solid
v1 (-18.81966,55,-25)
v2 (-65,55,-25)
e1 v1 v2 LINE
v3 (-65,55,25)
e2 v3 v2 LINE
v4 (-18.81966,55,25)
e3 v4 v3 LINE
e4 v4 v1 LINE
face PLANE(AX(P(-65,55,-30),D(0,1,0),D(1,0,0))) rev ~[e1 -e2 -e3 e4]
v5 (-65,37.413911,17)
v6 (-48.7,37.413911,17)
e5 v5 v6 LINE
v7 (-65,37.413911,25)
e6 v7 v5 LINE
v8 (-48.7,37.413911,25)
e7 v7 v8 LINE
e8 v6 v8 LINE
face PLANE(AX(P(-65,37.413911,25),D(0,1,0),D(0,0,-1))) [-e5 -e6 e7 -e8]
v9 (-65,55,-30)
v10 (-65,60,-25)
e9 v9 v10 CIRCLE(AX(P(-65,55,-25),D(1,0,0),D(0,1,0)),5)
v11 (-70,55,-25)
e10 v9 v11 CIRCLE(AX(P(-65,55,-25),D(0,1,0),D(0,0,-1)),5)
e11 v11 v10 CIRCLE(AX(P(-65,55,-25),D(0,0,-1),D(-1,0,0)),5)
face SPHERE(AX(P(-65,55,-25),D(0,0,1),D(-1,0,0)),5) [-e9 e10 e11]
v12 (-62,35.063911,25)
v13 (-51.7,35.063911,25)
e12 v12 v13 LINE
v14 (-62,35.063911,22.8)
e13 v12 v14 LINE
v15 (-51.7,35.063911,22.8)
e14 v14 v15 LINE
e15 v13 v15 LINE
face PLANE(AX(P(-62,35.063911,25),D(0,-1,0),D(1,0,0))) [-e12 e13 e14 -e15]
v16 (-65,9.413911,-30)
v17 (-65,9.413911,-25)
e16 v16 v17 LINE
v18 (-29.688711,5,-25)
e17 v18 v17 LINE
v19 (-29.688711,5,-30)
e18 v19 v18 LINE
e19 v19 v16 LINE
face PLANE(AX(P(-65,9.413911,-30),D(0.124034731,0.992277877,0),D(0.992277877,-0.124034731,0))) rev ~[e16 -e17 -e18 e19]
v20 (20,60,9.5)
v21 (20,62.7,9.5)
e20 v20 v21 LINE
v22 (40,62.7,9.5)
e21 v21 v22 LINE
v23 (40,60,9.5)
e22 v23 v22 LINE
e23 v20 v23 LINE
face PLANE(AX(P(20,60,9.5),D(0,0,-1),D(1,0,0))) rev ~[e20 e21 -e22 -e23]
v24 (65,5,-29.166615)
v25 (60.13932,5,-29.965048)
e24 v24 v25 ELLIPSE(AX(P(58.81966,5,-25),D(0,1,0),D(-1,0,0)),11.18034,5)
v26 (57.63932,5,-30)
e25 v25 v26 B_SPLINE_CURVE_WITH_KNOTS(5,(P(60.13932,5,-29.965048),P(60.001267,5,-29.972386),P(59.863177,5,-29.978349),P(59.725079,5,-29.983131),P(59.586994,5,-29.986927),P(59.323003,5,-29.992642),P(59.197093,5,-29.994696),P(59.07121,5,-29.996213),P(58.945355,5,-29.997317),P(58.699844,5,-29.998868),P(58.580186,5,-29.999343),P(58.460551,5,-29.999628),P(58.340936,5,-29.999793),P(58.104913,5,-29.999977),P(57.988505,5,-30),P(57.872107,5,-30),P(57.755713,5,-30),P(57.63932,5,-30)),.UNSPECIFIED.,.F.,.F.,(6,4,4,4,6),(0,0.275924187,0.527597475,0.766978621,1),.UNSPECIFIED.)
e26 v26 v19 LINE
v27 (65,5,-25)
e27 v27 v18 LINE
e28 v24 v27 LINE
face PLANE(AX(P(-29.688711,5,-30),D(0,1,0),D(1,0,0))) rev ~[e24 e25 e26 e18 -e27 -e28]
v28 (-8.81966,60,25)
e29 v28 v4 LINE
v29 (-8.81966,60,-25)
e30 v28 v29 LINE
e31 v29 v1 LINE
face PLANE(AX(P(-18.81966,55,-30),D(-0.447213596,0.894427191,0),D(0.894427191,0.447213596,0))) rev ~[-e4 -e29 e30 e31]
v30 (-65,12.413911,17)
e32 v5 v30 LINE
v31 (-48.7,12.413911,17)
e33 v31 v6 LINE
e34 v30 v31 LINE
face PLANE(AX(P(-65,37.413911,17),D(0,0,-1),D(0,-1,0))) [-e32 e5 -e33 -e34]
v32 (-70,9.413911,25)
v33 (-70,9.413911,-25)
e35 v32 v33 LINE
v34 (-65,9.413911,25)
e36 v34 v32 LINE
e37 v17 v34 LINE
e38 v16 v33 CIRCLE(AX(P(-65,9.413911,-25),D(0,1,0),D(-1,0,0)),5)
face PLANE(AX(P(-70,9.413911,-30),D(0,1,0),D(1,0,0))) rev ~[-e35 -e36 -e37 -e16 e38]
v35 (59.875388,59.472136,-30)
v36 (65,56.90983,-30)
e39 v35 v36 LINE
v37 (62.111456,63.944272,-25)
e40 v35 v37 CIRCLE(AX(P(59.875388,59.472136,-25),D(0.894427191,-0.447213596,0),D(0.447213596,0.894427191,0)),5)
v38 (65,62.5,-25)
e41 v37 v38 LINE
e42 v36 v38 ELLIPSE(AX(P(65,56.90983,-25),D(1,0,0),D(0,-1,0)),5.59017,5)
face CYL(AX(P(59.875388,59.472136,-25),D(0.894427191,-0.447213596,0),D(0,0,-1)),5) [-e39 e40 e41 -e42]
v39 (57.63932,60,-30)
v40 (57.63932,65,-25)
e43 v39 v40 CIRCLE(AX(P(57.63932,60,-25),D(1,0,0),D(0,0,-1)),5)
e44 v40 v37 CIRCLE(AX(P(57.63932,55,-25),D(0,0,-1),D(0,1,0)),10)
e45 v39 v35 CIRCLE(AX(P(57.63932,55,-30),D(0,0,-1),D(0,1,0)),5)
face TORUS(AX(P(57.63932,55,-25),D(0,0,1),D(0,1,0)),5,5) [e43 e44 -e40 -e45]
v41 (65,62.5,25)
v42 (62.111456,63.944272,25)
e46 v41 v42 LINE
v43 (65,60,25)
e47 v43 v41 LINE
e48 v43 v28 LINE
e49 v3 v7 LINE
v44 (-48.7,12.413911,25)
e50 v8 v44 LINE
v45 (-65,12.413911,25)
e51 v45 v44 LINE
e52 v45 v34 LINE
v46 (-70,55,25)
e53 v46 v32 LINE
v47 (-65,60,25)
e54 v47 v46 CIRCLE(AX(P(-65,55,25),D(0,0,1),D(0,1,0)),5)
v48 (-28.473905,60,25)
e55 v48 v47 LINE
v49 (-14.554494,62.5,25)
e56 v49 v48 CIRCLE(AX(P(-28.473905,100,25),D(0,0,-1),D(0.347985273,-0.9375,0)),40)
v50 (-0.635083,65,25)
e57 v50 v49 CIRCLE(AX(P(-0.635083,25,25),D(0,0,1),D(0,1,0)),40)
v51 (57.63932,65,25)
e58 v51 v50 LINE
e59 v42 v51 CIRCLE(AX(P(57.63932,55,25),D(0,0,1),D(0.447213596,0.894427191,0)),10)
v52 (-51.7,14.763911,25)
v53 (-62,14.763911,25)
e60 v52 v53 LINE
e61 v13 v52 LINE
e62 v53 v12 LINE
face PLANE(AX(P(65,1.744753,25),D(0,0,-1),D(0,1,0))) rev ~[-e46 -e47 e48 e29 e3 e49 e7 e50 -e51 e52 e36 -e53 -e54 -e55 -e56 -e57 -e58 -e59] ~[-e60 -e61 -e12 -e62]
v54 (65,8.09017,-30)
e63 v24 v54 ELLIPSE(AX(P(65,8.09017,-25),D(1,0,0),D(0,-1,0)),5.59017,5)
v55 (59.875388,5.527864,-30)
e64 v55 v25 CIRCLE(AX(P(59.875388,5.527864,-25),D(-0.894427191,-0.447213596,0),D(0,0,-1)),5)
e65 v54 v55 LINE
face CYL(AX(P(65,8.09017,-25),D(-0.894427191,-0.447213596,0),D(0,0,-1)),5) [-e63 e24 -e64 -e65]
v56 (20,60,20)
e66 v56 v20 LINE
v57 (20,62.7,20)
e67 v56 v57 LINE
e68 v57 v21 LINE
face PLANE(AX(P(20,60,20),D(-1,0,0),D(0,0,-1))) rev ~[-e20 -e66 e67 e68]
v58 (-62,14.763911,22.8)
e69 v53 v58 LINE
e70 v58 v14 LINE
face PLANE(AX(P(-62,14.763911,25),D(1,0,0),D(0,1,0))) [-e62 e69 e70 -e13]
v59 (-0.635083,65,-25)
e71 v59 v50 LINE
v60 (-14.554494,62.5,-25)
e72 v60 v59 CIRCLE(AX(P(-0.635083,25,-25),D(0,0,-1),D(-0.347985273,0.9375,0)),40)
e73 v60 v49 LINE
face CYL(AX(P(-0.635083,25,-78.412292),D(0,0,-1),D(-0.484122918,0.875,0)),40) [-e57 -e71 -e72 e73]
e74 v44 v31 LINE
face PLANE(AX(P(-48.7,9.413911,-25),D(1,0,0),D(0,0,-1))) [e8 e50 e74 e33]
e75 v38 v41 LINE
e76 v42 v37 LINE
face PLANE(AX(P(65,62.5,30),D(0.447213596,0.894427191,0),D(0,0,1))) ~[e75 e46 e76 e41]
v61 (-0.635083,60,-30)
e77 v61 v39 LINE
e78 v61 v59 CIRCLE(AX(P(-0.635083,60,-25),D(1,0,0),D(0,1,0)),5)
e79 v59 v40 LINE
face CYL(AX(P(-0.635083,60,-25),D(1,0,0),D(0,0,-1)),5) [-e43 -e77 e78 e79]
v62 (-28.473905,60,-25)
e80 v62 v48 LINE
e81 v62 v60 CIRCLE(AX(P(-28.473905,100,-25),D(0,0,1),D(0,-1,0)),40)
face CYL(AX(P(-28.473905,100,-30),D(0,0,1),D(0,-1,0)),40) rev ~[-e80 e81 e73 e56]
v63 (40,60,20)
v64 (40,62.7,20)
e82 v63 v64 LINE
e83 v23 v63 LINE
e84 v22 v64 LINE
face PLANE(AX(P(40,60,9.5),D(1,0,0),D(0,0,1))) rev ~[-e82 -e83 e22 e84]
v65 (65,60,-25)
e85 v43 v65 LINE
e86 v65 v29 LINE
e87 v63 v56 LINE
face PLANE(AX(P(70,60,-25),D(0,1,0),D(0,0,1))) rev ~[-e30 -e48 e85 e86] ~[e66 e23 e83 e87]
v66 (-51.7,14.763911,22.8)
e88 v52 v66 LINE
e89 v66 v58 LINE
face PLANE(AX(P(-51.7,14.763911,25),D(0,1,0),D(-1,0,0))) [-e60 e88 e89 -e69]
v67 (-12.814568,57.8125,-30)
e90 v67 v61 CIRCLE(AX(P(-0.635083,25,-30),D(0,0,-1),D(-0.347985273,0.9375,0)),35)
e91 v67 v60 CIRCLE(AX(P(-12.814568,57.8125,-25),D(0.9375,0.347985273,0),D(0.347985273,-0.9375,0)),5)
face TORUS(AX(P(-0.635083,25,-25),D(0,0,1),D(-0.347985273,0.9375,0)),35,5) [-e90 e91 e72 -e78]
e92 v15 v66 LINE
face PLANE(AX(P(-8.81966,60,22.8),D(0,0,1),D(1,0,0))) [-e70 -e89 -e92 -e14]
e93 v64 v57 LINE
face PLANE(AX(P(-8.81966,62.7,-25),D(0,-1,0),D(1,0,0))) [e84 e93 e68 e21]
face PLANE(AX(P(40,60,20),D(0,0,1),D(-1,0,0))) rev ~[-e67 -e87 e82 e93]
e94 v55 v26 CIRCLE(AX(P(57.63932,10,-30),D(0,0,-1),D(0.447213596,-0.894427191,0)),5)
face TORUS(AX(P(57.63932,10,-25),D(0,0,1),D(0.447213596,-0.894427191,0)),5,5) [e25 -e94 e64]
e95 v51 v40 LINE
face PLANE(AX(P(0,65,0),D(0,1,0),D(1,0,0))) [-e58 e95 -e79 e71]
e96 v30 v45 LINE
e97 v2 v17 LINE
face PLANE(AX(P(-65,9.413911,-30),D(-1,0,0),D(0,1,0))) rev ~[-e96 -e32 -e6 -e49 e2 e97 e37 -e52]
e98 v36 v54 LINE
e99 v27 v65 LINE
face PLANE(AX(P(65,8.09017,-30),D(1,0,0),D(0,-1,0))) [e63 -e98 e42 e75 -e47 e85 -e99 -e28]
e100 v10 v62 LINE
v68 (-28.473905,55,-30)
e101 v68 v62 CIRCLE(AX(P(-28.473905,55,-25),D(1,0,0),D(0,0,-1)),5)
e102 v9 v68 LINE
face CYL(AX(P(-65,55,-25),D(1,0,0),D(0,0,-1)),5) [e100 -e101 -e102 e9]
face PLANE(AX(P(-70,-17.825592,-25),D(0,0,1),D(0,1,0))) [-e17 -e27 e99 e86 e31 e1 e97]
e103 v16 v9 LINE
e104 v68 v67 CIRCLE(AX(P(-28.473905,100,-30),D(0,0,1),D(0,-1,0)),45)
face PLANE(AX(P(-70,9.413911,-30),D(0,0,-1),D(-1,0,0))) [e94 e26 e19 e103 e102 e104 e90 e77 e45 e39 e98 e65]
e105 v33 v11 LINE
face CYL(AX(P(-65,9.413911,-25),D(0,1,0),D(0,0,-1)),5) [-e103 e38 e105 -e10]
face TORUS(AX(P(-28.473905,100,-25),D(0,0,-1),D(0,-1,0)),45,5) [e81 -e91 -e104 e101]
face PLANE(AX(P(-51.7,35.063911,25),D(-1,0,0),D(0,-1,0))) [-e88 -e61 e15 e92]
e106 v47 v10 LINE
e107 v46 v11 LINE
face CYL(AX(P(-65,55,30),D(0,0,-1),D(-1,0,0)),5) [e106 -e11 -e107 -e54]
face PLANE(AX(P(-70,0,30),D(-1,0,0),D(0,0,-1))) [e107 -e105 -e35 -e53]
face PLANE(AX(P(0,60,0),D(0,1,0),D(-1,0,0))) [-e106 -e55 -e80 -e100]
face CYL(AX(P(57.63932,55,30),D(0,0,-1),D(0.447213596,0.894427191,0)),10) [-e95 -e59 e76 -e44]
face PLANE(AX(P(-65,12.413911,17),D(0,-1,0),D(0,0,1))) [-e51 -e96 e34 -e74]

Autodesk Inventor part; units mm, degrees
ref_plane "YZ Plane" through (0, 0, 0) normal (1, 0, 0) x (0, 1, 0)
ref_plane "XZ Plane" through (0, 0, 0) normal (0, 1, 0) x (-1, 0, 0)
ref_plane "XY Plane" through (0, 0, 0) normal (0, 0, 1) x (1, 0, 0)
sketch "Sketch1" plane through (0, 0, 0) normal (0, 1, 0) x (-1, 0, 0)
  line L0 (-70, 30) -> (70, 30)
  line L1 (70, 30) -> (70, -30)
  line L2 (70, -30) -> (-70, -30)
  line L3 (-70, -30) -> (-70, 30)
  line L4 (-70, 30) -> (70, -30) construction
  line L5 (70, 30) -> (-70, -30) construction
  point P0 (0, 0)
  dimension "d0" = 140
  dimension "d1" = 60
extrude "Extrusion1" add sketch "Sketch1" along normal blind 60
sketch "Sketch2" plane through (0, 60, 0) normal (0, 1, 0) x (1, 0, 0)
  point P0 (0, 0)
sketch "Sketch3" plane through (0, 60, 0) normal (0, 1, 0) x (1, 0, 0)
  line L0 (70, 30) -> (-70, 30) projected
  line L1 (-70, -30) -> (70, -30) projected
  line L2 (70, 30) -> (-20, 30)
  line L3 (-20, 30) -> (-20, -30)
  line L4 (-20, -30) -> (70, -30)
  line L5 (70, -30) -> (70, 30)
  point P0 (0, 0)
  point P1 (70, -30)
  point P2 (-20, 30)
  dimension "d4" = 90
extrude "Extrusion2" add sketch "Sketch3" along normal blind 5
chamfer "Chamfer2" distance 5 distance2 40 1 edges at (-70, 0, 0) measured on face at (-70, 20, -10)
sketch "Sketch8" plane through (70, 0, 30) normal (1, 0, 0) x (0, 0, -1)
  circle A0 centre (30, 32.5) radius 13.25
  line L0 (0, 0) -> (60, 0) projected
  line L1 (60, 0) -> (60, 65) projected
  line L2 (0, 65) -> (60, 65) projected
  point P0 (30, 0)
  point P1 (60, 32.5)
  dimension "d26" = 26.5
  dimension "d27" = 32.5
  dimension "d28" = 30
  dimension "d88" = 32.5
extrude "Extrusion6" cut sketch "Sketch8" against normal blind 10
sketch "Sketch9" plane through (70, 0, -30) normal (0, 0, -1) x (-1, 0, 0)
  line L0 (5, 60) -> (5, 5)
  line L1 (5, 5) -> (99.688711, 5)
  line L2 (99.688711, 5) -> (135, 9.413911)
  line L3 (135, 9.413911) -> (135, 55)
  line L4 (135, 55) -> (88.81966, 55)
  line L5 (88.81966, 55) -> (78.81966, 60)
  line L6 (78.81966, 60) -> (5, 60)
  line L7 (0, 65) -> (90, 65)
  line L8 (50, 80) -> (90, 60)
  line L9 (90, 60) -> (140, 60)
  line L10 (140, 5) -> (140, 60)
  line L11 (140, 5) -> (100, 0)
  line L12 (0, 0) -> (100, 0)
  line L13 (0, 0) -> (0, 65)
  point P0 (70, 0)
  dimension "d35" = 5
  dimension "d36" = 5
  dimension "d37" = 5
  dimension "d38" = 5
  dimension "d39" = 5
  dimension "d40" = 5
  dimension "d41" = 5
extrude "Extrusion7" cut sketch "Sketch9" against normal blind 55 contours L6 L5 L4 L3 L2 L1 L0
ref_plane "Work Plane1" through (70, 0, 0) normal (0, 0, 1) x (1, 0, 0)
fillet "Fillet6" radius 5 1 edges at (-70, 60, 0)
fillet "Fillet9" radius 5 1 edges at (-70, 5, 0)
fillet "Fillet21" radius 40 1 edges at (-20, 65, 0)
fillet "Fillet22" radius 40 1 edges at (-20, 60, 0)
chamfer "Chamfer3" distance 10 distance2 5 1 edges at (70, 65, 0) measured on face at (46.455, 65, 10)
fillet "Fillet23" radius 5 1 edges at (70, 60, 0)
fillet "Fillet24" radius 10 1 edges at (60, 65, 0)
chamfer "Chamfer4" distance 5 distance2 10 1 edges at (70, 0, 0) measured on face at (70, 6.4489, -0.5324)
fillet "Fillet25" radius 10 1 edges at (60, 0, 0)
fillet "Fillet26" radius 5 1 edges at (70, 5, 0)
fillet "Fillet27" radius 5 15 edges at (59.9368, 64.7325, 30) (64.6738, 62.6631, 30) (69.2533, 59.5385, 30) (70, 32.5, 30) (69.2533, 5.4615, 30) (64.6738, 2.3369, 30) (59.9368, 0.2675, 30) (13.8197, 0, 30) (-7.7062, 64.37, 30) (-21.4028, 60.63, 30) (-46.737, 60, 30) (-70, 32.207, 30) (-68.7484, 6.1049, 30) (-47.8101, 2.2263, 30) (28.5021, 65, 30)
ref_plane "Work Plane7" through (65, 55, -24.5) normal (0, 0, -1) x (-1, 0, 0)
sketch "Sketch24" plane through (65, 55, -24.5) normal (0, 0, -1) x (-1, 0, 0)
  line L0 (0, 0) -> (5, 0) projected
  line L1 (5, 5) -> (5, 0) projected
  line L2 (5, 0) -> (5, 5) projected
  line L3 (0, 0) -> (0, 5) projected
  line L4 (5, 5) -> (0, 0)
  line L5 (5, -45) -> (5, -50) projected
  line L6 (0, -45) -> (5, -45) projected
  line L7 (0, -50) -> (0, -45) projected
  line L8 (0, -45) -> (5, -50)
  point P0 (65, -55)
extrude "Extrusion21" cut sketch "Sketch24" against normal blind 5
sketch "Sketch27" plane through (65, 5, -30) normal (-1, 0, 0) x (0, 0, 1)
  line L0 (8.5, 30) -> (13.5, 30)
  line L1 (13.5, 30) -> (13.5, 25)
  line L2 (13.5, 25) -> (8.5, 25)
  line L3 (8.5, 25) -> (8.5, 30)
  line L4 (8.5, 30) -> (13.5, 25) construction
  line L5 (13.5, 30) -> (8.5, 25) construction
  circle A0 centre (30, 27.5) radius 13.25 projected
  line L6 (30, 73) -> (30, -18) projected
  line L7 (51.5, 30) -> (46.5, 30)
  line L8 (46.5, 30) -> (46.5, 25)
  line L9 (46.5, 25) -> (51.5, 25)
  line L10 (51.5, 25) -> (51.5, 30)
  point P0 (30, -5)
  point P1 (11, 27.5)
  dimension "d137" = 0
  dimension "d138" = 19
  dimension "d139" = 5
  dimension "d140" = 5
extrude "Extrusion24" add sketch "Sketch27" along normal blind 10 contours L0 L1 L2 L3 | L10 L9 L8 L7
sketch "Sketch28" plane through (65, 30, 16.5) normal (0, 0, -1) x (-1, 0, 0)
  line L0 (0, 5) -> (10, 5) projected
  line L1 (0, 0) -> (10, 0) projected
  line L2 (10, 5) -> (5, 5)
  line L3 (5, 5) -> (5, 0)
  line L4 (5, 0) -> (10, 0)
  line L5 (10, 0) -> (10, 5)
  point P0 (65, -30)
  point P1 (5, 5)
  dimension "d143" = 5
extrude "Extrusion25" add sketch "Sketch28" along normal up to surface (33 mm away)
sketch "Sketch29" plane through (55, 5, -30) normal (-1, 0, 0) x (0, 0, 1)
  line L0 (30, 73) -> (30, -18) projected
  circle A0 centre (25.5, 27.5) radius 1.5
  line L1 (51.5, 30) -> (8.5, 30) projected
  line L2 (8.5, 25) -> (51.5, 25) projected
  circle A1 centre (34.5, 27.5) radius 1.5
  point P0 (30, -5)
  dimension "d146" = 4.5
  dimension "d147" = 3
  dimension "d148" = 2.5
  dimension "d149" = 2.5
extrude "Extrusion26" cut sketch "Sketch29" against normal up to surface (5 mm away)
sketch "Sketch30" plane through (55, 5, -30) normal (-1, 0, 0) x (0, 0, 1)
  line L0 (30, 73) -> (30, -18) projected
  circle A0 centre (30, 27.5) radius 3.5
  line L1 (51.5, 30) -> (8.5, 30) projected
  point P0 (30, -5)
  dimension "d152" = 2.5
  dimension "d153" = 7
extrude "Extrusion27" cut sketch "Sketch30" against normal up to surface (5 mm away)
sketch "Sketch32" plane through (0, 0, 0) normal (0, -1, 0) x (1, 0, 0)
  circle A0 centre (20, 0) radius 14.25
  line L0 (65, -30) -> (65, 25) projected
  point P0 (0, 0)
  point P1 (65, -21.5)
  dimension "d158" = 28.5
  dimension "d159" = 45
extrude "Extrusion29" cut sketch "Sketch32" against normal blind 5
ref_plane "Work Plane4" through (0, 32.5, 0) normal (0, -1, 0) x (1, 0, 0)
sketch "Sketch34" plane through (-29.688711, 5, -30) normal (0, 1, 0) x (1, 0, 0)
  line L0 (15.188711, -15.5) -> (8.188711, -15.5)
  line L1 (8.188711, -15.5) -> (8.188711, -8.5)
  line L2 (8.188711, -8.5) -> (15.188711, -8.5)
  line L3 (15.188711, -8.5) -> (15.188711, -15.5)
  line L4 (15.188711, -15.5) -> (8.188711, -8.5) construction
  line L5 (8.188711, -15.5) -> (15.188711, -8.5) construction
  line L6 (127.688711, -30) -> (-68.311289, -30)
  circle A0 centre (49.688711, -30) radius 14.25
  line L7 (15.188711, -44.5) -> (8.188711, -44.5)
  line L8 (8.188711, -44.5) -> (8.188711, -51.5)
  line L9 (8.188711, -51.5) -> (15.188711, -51.5)
  line L10 (15.188711, -51.5) -> (15.188711, -44.5)
  point P0 (29.688711, -30)
  point P1 (11.688711, -12)
  dimension "d163" = 7
  dimension "d164" = 7
  dimension "d166" = 18
  dimension "d167" = 38
extrude "Extrusion30" add sketch "Sketch34" along normal blind 12 contours L0 L1 L2 L3 | L10 L9 L8 L7
sketch "Sketch35" plane through (-29.688711, 17, -30) normal (0, 1, 0) x (1, 0, 0)
  circle A0 centre (11.688711, -48) radius 2
  line L0 (8.188711, -44.5) -> (8.188711, -51.5)
  line L1 (15.188711, -44.5) -> (8.188711, -44.5)
  line L2 (15.188711, -51.5) -> (15.188711, -44.5)
  line L3 (127.688711, -30) -> (-68.311289, -30)
  circle A1 centre (11.688711, -12) radius 2
  point P0 (29.688711, -30)
  dimension "d170" = 4
  dimension "d171" = 3.5
  dimension "d172" = 3.5
  dimension "d173" = 3.5
extrude "Extrusion31" cut sketch "Sketch35" against normal blind 5
sketch "Sketch37" plane through (-29.688711, 5, -30) normal (0, 1, 0) x (1, 0, 0)
  line L0 (8.188711, -51.5) -> (8.188711, -44.5)
  line L1 (0, -55) -> (94.688711, -55)
  line L2 (8.188711, -51.5) -> (15.188711, -51.5)
  line L3 (15.188711, -51.5) -> (15.188711, -55)
  line L4 (15.188711, -55) -> (8.188711, -55)
  line L5 (8.188711, -55) -> (8.188711, -51.5)
  line L6 (15.188711, -44.5) -> (15.188711, -51.5)
  point P0 (29.688711, -30)
  point P1 (8.188711, -55)
  dimension "d178" = 0
extrude "Extrusion32" add sketch "Sketch37" along normal blind 12
sketch "Sketch38" plane through (65, 30, 21.5) normal (0, 0, 1) x (1, 0, 0)
  line L0 (0, 5) -> (0, 0) projected
  line L1 (0, 5) -> (-10, 5) projected
  line L2 (-10, 0) -> (-10, 5) projected
  line L3 (0, 0) -> (-10, 0) projected
  point P0 (-65, -30)
extrude "Extrusion33" add sketch "Sketch38" along normal up to surface (3.5 mm away)
ref_plane "Work Plane6" through (-70, 9.413911, -22.5) normal (0, 0, -1) x (-1, 0, 0)
ref_plane "Work Plane5" through (-70, 9.413911, -15) normal (0, 0, -1) x (-1, 0, 0)
sketch "Sketch42" plane through (55, 5, -30) normal (-1, 0, 0) x (0, 0, 1)
  line L0 (22.5, 34) -> (37.5, 34)
  line L1 (37.5, 34) -> (37.5, 21)
  line L2 (37.5, 21) -> (22.5, 21)
  line L3 (22.5, 21) -> (22.5, 34)
  arc A0 (32.44949, 25) -> (33.361111, 26.523818) centre (30, 27.5) ccw
  line L4 (22.5, 34) -> (37.5, 21) construction
  line L5 (37.5, 34) -> (22.5, 21) construction
  point P0 (30, -5)
  dimension "d193" = 15
  dimension "d194" = 13
extrude "Extrusion36" add sketch "Sketch42" against normal blind 5
sketch "Sketch43" plane through (55, 5, -30) normal (-1, 0, 0) x (0, 0, 1)
  line L0 (24, 32.5) -> (36, 32.5)
  line L1 (36, 32.5) -> (36, 22.5)
  line L2 (36, 22.5) -> (24, 22.5)
  line L3 (24, 22.5) -> (24, 32.5)
  circle A0 centre (30, 27.5) radius 2.15 projected
  line L4 (24, 32.5) -> (36, 22.5) construction
  line L5 (36, 32.5) -> (24, 22.5) construction
  point P0 (30, -5)
  dimension "d197" = 12
  dimension "d199" = 10
extrude "Extrusion37" cut sketch "Sketch43" against normal blind 2.5
sketch "Sketch44" plane through (55, 5, -30) normal (-1, 0, 0) x (0, 0, 1)
  line L0 (22.5, 25) -> (22.5, 21) projected
  line L1 (8.5, 25) -> (22.5, 25) projected
  line L2 (22.5, 21) -> (18.5, 25)
  point P0 (30, -5)
  dimension "d202" = 45
  dimension "d203" = 45
extrude "Extrusion38" add sketch "Sketch44" against normal blind 5
mirror "Mirror1" about plane through (70, 0, 0) normal (0, 0, 1) of "Extrusion38"
sketch "Sketch45" plane through (55, 5, -30) normal (-1, 0, 0) x (0, 0, 1)
  line L0 (37.5, 34) -> (22.5, 34) projected
  line L1 (22.5, 34) -> (18.5, 30)
  line L2 (8.5, 30) -> (22.5, 30) projected
  line L3 (22.5, 34) -> (22.5, 30) projected
  point P0 (30, -5)
  dimension "d206" = 45
  dimension "d207" = 45
extrude "Extrusion39" add sketch "Sketch45" against normal blind 5
mirror "Mirror2" about plane through (70, 0, 0) normal (0, 0, 1) of "Extrusion39"
sketch "Sketch46" plane through (55, 32.5, 0) normal (-1, 0, 0) x (0, 0, 1)
  circle A0 centre (0, 0) radius 4
  point P0 (0, -32.5)
  dimension "d210" = 8
extrude "Extrusion40" cut sketch "Sketch46" against normal blind 5
sketch "Sketch47" plane through (70, 0, 25) normal (0, 0, -1) x (-1, 0, 0)
  line L0 (5, 35) -> (15, 35)
  line L1 (15, 35) -> (15, 30)
  line L2 (15, 30) -> (5, 30)
  line L3 (5, 5) -> (5, 30)
  line L4 (84.5, 5) -> (5, 5)
  line L5 (84.5, 5) -> (84.5, 17)
  line L6 (84.5, 17) -> (91.5, 17)
  line L7 (91.5, 17) -> (91.5, 5)
  line L8 (99.688711, 5) -> (91.5, 5)
  line L9 (135, 9.413911) -> (99.688711, 5)
  line L10 (135, 55) -> (135, 9.413911)
  line L11 (88.81966, 55) -> (135, 55)
  line L12 (78.81966, 60) -> (88.81966, 55)
  line L13 (5, 60) -> (78.81966, 60)
  line L14 (5, 35) -> (5, 60)
  line L15 (91.5, 5) -> (84.5, 5)
  point P0 (70, 0)
extrude "Extrusion41" cut sketch "Sketch47" against normal blind 10
sketch "Sketch48" plane through (-70, 9.413911, -30) normal (0, 0, -1) x (-1, 0, 0)
  line L0 (-135, 50.586089) -> (-61.18034, 50.586089)
  line L1 (-61.18034, 50.586089) -> (-51.18034, 45.586089)
  line L2 (-51.18034, 45.586089) -> (-5, 45.586089)
  line L3 (-5, 45.586089) -> (-5, 0)
  line L4 (-5, 0) -> (-40.311289, -4.413911)
  line L5 (-40.311289, -4.413911) -> (-135, -4.413911)
  line L6 (-135, -4.413911) -> (-135, 50.586089)
  point P0 (-70, -9.413911)
extrude "Extrusion42" add sketch "Sketch48" against normal blind 5
fillet "Fillet29" radius 5 16 edges at (-7.7062, 64.37, -30) (-21.4028, 60.63, -30) (-46.737, 60, -30) (-68.5355, 58.5355, -30) (-70, 32.207, -30) (-68.7484, 6.1049, -30) (-47.8101, 2.2263, -30) (59.9368, 64.7325, -30) (64.6738, 62.6631, -30) (69.2533, 59.5385, -30) (70, 32.5, -30) (69.2533, 5.4615, -30) (64.6738, 2.3369, -30) (59.9368, 0.2675, -30) (13.8197, 0, -30) (28.5021, 65, -30)
sketch "Sketch50" plane through (70, 8.09017, 25) normal (1, 0, 0) x (0, 0, -1)
  line L0 (50, -3.09017) -> (-4.166615, -3.09017)
  line L1 (-5, 21.90983) -> (-5, 0)
  line L2 (-5, 48.81966) -> (-5, 26.90983)
  line L3 (-5, 26.90983) -> (-5, 21.90983)
  ellipse E0 centre (0, 0) end of major axis (0, -5.59017) minor radius 5 (-5, 0) -> (-4.166615, -3.09017) ccw
  line L4 (50, 51.90983) -> (-4.166615, 51.90983)
  line L5 (55, 0) -> (55, 48.81966)
  ellipse E1 centre (50, 0) end of major axis (55, 0) minor radius 4.472136 (50, -4.472136) -> (55, 0) ccw
  line L6 (46.5, 51.90983) -> (55, 51.90983)
  line L7 (55, 51.90983) -> (55, 48.23178)
  line L8 (-4.166615, 51.90983) -> (-5, 51.90983)
  ellipse E2 centre (0, 48.81966) end of major axis (-5, 48.81966) minor radius 4.472136 (0, 53.291796) -> (-5, 48.81966) ccw
  line L9 (-5, 51.90983) -> (-5, 48.81966)
  line L10 (46.5, -3.09017) -> (53.614355, -3.09017)
  line L11 (50, 48.81966) -> (50, 0)
  line L12 (50, -4.472136) -> (50, 0)
  line L13 (50, 48.81966) -> (50, 53.291796)
  point P0 (25, -8.09017)
  point P1 (-3.614355, 51.90983)
sketch "Sketch51" plane through (-0.635083, 60, 30) normal (0, -1, 0) x (1, 0, 0)
  line L0 (65.635083, -55) -> (65.635083, -0.833385)
  line L1 (70.635083, -5) -> (70.635083, -55)
  line L2 (70.635083, -51.5) -> (70.635083, -0.833385)
  line L3 (65.635083, -0.833385) -> (70.635083, -0.833385)
  line L4 (58.274403, 0) -> (-29.053628, 0)
  line L5 (-8.184577, -55) -> (65.635083, -55)
  line L6 (70.635083, -60) -> (65.635083, -55)
  line L7 (70.635083, -60) -> (65.635083, -55)
  line L8 (67.871151, -55) -> (70.635083, -55)
  line L9 (65.635083, -55) -> (70.635083, -55)
  point P0 (0.635083, -30)
  point P1 (65.635083, -51.5)
  point P2 (65.635083, -55)
  point P3 (67.871151, -55)
extrude "Extrusion43" cut sketch "Sketch50" against normal blind 50 contours L0 E0 L1 L3 L2 E2 L4 L13 L11 L12
extrude "Extrusion44" cut sketch "Sketch51" against normal blind 50
sketch "Sketch52" plane through (-0.635083, 60, 30) normal (0, 1, 0) x (1, 0, 0)
  line L0 (67.180168, 1.385645) -> (65.635083, 1.385645)
  line L1 (65.635083, 1.385645) -> (68.166593, 1.385645)
  line L2 (68.166593, 1.385645) -> (68.166593, -1.6054)
  line L3 (68.166593, -1.6054) -> (65.635083, -1.6054)
  line L4 (65.635083, -1.6054) -> (65.635083, 1.385645)
  point P0 (0.635083, 30)
  point P1 (67.180168, 1.385645)
extrude "Extrusion45" cut sketch "Sketch52" against normal blind 10
sketch "Sketch53" plane through (-70, 9.413911, 25) normal (-1, 0, 0) x (0, 0, 1)
  line L0 (-50, 0) -> (-50, 45.586089)
  line L1 (-50, 0) -> (13.21215, 0)
  line L2 (13.21215, 0) -> (13.21215, -27.239503)
  line L3 (13.21215, -27.239503) -> (-50, -27.239503)
  line L4 (-50, -27.239503) -> (-50, 0)
  point P0 (-25, -9.413911)
extrude "Extrusion46" cut sketch "Sketch53" against normal blind 200
sketch "Sketch54" plane through (-14.5, 17, 25) normal (1, 0, 0) x (0, 0, -1)
  line L0 (0, 0) -> (10.5, 0)
  line L1 (0, 0) -> (47.590826, 0)
  line L2 (47.590826, 0) -> (47.590826, -20.025121)
  line L3 (47.590826, -20.025121) -> (0, -20.025121)
  line L4 (0, -20.025121) -> (0, 0)
  point P0 (25, -17)
  point P1 (10.5, 0)
extrude "Extrusion47" cut sketch "Sketch54" against normal blind 10
sketch "Sketch55" plane through (57.63932, 5, -30) normal (0, 0, -1) x (-1, 0, 0)
  line L0 (122.63932, 4.413911) -> (87.328031, 0)
  line L1 (127.63932, 4.413911) -> (122.63932, 4.413911)
  line L2 (87.328031, 0) -> (0, 0)
  line L3 (-7.36068, 55) -> (-7.36068, 57.5)
  line L4 (-7.36068, 3.09017) -> (-7.36068, 51.90983)
  line L5 (-7.36068, 51.90983) -> (-7.36068, 55)
  line L6 (-9.596748, -1.381966) -> (-7.36068, 3.09017)
  line L7 (-7.36068, 3.09017) -> (-7.36068, 0)
  arc A0 (-2.236068, 0.527864) -> (0, 0) centre (0, 5) ccw
  line L8 (-7.36068, 0) -> (0, 0)
  arc A1 (-9.596748, 56.381966) -> (-12.36068, 51.90983) centre (-7.36068, 51.90983) ccw
  line L9 (-12.36068, 51.90983) -> (-12.36068, 3.09017)
  arc A2 (-12.36068, 3.09017) -> (-9.596748, -1.381966) centre (-7.36068, 3.09017) ccw
  line L10 (-9.596748, -1.381966) -> (-4.472136, -3.944272)
  arc A3 (-4.472136, -3.944272) -> (0, -5) centre (0, 5) ccw
  line L11 (0, -5) -> (87.63932, -5)
  line L12 (87.63932, -5) -> (123.259494, -0.547478)
  arc A4 (123.259494, -0.547478) -> (127.63932, 4.413911) centre (122.63932, 4.413911) ccw
  line L13 (-7.36068, 57.5) -> (-9.596748, 56.381966)
  point P0 (57.63932, -5)
extrude "Extrusion48" cut sketch "Sketch55" against normal blind 10
sketch "Sketch56" plane through (65, 60, 29.166615) normal (1, 0, 0) x (0, 0, -1)
  arc A0 (4.166615, 5) -> (-0.833385, 0) centre (4.166615, 0) ccw
  line L0 (4.166615, 5) -> (-2.994967, 5)
  line L1 (-2.994967, 5) -> (-2.994967, -58.255247)
  line L2 (-2.994967, -58.255247) -> (4.166615, -58.255247)
  line L3 (4.166615, -58.255247) -> (4.166615, 5)
  point P0 (29.166615, -60)
extrude "Extrusion49" cut sketch "Sketch56" against normal through all
sketch "Sketch57" plane through (-8.81966, 60, -25) normal (0, -1, 0) x (1, 0, 0)
  line L0 (28.81966, 34.5) -> (48.81966, 34.5)
  line L1 (48.81966, 34.5) -> (48.81966, 45)
  line L2 (48.81966, 45) -> (28.81966, 45)
  line L3 (28.81966, 45) -> (28.81966, 34.5)
  line L4 (73.81966, 0) -> (73.81966, 50)
  line L5 (73.81966, 50) -> (0, 50)
  point P0 (8.81966, 25)
  point P1 (48.81966, 39.75)
  point P2 (36.90983, 50)
  dimension "d232" = 25
  dimension "d233" = 15.5
  dimension "d234" = 5
  dimension "d235" = 20
extrude "Extrusion50" cut sketch "Sketch57" against normal blind 2.7
sketch "Sketch58" plane through (-65, 9.413911, -25) normal (1, 0, 0) x (0, 0, -1)
  line L0 (-50, 28) -> (-42, 28)
  line L1 (-42, 28) -> (-42, 3)
  line L2 (-42, 3) -> (-50, 3)
  line L3 (-50, 3) -> (-50, 28)
  line L4 (0, 0) -> (-50, 0)
  line L5 (-50, 45.586089) -> (-50, 0)
  point P0 (-25, -9.413911)
  dimension "d238" = 8
  dimension "d239" = 3
  dimension "d240" = 0
  dimension "d241" = 25
extrude "Extrusion51" add sketch "Sketch58" along normal blind 22
sketch "Sketch59" plane through (-8.81966, 60, 25) normal (0, 0, 1) x (1, 0, 0)
  line L0 (-53.18034, -24.936089) -> (-42.88034, -24.936089)
  line L1 (-42.88034, -24.936089) -> (-42.88034, -45.236089)
  line L2 (-42.88034, -45.236089) -> (-53.18034, -45.236089)
  line L3 (-53.18034, -45.236089) -> (-53.18034, -24.936089)
  line L4 (-56.18034, -5) -> (-56.18034, -22.586089)
  line L5 (-61.18034, -5) -> (-61.18034, -50.586089)
  line L6 (-56.18034, -47.586089) -> (-34.18034, -47.586089)
  line L7 (-56.18034, -22.586089) -> (-34.18034, -22.586089)
  point P0 (8.81966, -60)
  dimension "d245" = 8
  dimension "d246" = 10.3
  dimension "d247" = 20.3
  dimension "d248" = 2.35
  dimension "d249" = 2.35
extrude "Extrusion52" cut sketch "Sketch59" against normal blind 2.2
sketch "Sketch60" plane through (-43, 9.413911, -25) normal (1, 0, 0) x (0, 0, -1)
  line L0 (-42, 28) -> (-50, 28) projected
  line L1 (-50, 28) -> (-50, 3) projected
  line L2 (-50, 3) -> (-42, 3) projected
  line L3 (-42, 3) -> (-42, 28) projected
  point P0 (-25, -9.413911)
extrude "Extrusion53" cut sketch "Sketch60" against normal blind 5.7
properties part number "gondola"
